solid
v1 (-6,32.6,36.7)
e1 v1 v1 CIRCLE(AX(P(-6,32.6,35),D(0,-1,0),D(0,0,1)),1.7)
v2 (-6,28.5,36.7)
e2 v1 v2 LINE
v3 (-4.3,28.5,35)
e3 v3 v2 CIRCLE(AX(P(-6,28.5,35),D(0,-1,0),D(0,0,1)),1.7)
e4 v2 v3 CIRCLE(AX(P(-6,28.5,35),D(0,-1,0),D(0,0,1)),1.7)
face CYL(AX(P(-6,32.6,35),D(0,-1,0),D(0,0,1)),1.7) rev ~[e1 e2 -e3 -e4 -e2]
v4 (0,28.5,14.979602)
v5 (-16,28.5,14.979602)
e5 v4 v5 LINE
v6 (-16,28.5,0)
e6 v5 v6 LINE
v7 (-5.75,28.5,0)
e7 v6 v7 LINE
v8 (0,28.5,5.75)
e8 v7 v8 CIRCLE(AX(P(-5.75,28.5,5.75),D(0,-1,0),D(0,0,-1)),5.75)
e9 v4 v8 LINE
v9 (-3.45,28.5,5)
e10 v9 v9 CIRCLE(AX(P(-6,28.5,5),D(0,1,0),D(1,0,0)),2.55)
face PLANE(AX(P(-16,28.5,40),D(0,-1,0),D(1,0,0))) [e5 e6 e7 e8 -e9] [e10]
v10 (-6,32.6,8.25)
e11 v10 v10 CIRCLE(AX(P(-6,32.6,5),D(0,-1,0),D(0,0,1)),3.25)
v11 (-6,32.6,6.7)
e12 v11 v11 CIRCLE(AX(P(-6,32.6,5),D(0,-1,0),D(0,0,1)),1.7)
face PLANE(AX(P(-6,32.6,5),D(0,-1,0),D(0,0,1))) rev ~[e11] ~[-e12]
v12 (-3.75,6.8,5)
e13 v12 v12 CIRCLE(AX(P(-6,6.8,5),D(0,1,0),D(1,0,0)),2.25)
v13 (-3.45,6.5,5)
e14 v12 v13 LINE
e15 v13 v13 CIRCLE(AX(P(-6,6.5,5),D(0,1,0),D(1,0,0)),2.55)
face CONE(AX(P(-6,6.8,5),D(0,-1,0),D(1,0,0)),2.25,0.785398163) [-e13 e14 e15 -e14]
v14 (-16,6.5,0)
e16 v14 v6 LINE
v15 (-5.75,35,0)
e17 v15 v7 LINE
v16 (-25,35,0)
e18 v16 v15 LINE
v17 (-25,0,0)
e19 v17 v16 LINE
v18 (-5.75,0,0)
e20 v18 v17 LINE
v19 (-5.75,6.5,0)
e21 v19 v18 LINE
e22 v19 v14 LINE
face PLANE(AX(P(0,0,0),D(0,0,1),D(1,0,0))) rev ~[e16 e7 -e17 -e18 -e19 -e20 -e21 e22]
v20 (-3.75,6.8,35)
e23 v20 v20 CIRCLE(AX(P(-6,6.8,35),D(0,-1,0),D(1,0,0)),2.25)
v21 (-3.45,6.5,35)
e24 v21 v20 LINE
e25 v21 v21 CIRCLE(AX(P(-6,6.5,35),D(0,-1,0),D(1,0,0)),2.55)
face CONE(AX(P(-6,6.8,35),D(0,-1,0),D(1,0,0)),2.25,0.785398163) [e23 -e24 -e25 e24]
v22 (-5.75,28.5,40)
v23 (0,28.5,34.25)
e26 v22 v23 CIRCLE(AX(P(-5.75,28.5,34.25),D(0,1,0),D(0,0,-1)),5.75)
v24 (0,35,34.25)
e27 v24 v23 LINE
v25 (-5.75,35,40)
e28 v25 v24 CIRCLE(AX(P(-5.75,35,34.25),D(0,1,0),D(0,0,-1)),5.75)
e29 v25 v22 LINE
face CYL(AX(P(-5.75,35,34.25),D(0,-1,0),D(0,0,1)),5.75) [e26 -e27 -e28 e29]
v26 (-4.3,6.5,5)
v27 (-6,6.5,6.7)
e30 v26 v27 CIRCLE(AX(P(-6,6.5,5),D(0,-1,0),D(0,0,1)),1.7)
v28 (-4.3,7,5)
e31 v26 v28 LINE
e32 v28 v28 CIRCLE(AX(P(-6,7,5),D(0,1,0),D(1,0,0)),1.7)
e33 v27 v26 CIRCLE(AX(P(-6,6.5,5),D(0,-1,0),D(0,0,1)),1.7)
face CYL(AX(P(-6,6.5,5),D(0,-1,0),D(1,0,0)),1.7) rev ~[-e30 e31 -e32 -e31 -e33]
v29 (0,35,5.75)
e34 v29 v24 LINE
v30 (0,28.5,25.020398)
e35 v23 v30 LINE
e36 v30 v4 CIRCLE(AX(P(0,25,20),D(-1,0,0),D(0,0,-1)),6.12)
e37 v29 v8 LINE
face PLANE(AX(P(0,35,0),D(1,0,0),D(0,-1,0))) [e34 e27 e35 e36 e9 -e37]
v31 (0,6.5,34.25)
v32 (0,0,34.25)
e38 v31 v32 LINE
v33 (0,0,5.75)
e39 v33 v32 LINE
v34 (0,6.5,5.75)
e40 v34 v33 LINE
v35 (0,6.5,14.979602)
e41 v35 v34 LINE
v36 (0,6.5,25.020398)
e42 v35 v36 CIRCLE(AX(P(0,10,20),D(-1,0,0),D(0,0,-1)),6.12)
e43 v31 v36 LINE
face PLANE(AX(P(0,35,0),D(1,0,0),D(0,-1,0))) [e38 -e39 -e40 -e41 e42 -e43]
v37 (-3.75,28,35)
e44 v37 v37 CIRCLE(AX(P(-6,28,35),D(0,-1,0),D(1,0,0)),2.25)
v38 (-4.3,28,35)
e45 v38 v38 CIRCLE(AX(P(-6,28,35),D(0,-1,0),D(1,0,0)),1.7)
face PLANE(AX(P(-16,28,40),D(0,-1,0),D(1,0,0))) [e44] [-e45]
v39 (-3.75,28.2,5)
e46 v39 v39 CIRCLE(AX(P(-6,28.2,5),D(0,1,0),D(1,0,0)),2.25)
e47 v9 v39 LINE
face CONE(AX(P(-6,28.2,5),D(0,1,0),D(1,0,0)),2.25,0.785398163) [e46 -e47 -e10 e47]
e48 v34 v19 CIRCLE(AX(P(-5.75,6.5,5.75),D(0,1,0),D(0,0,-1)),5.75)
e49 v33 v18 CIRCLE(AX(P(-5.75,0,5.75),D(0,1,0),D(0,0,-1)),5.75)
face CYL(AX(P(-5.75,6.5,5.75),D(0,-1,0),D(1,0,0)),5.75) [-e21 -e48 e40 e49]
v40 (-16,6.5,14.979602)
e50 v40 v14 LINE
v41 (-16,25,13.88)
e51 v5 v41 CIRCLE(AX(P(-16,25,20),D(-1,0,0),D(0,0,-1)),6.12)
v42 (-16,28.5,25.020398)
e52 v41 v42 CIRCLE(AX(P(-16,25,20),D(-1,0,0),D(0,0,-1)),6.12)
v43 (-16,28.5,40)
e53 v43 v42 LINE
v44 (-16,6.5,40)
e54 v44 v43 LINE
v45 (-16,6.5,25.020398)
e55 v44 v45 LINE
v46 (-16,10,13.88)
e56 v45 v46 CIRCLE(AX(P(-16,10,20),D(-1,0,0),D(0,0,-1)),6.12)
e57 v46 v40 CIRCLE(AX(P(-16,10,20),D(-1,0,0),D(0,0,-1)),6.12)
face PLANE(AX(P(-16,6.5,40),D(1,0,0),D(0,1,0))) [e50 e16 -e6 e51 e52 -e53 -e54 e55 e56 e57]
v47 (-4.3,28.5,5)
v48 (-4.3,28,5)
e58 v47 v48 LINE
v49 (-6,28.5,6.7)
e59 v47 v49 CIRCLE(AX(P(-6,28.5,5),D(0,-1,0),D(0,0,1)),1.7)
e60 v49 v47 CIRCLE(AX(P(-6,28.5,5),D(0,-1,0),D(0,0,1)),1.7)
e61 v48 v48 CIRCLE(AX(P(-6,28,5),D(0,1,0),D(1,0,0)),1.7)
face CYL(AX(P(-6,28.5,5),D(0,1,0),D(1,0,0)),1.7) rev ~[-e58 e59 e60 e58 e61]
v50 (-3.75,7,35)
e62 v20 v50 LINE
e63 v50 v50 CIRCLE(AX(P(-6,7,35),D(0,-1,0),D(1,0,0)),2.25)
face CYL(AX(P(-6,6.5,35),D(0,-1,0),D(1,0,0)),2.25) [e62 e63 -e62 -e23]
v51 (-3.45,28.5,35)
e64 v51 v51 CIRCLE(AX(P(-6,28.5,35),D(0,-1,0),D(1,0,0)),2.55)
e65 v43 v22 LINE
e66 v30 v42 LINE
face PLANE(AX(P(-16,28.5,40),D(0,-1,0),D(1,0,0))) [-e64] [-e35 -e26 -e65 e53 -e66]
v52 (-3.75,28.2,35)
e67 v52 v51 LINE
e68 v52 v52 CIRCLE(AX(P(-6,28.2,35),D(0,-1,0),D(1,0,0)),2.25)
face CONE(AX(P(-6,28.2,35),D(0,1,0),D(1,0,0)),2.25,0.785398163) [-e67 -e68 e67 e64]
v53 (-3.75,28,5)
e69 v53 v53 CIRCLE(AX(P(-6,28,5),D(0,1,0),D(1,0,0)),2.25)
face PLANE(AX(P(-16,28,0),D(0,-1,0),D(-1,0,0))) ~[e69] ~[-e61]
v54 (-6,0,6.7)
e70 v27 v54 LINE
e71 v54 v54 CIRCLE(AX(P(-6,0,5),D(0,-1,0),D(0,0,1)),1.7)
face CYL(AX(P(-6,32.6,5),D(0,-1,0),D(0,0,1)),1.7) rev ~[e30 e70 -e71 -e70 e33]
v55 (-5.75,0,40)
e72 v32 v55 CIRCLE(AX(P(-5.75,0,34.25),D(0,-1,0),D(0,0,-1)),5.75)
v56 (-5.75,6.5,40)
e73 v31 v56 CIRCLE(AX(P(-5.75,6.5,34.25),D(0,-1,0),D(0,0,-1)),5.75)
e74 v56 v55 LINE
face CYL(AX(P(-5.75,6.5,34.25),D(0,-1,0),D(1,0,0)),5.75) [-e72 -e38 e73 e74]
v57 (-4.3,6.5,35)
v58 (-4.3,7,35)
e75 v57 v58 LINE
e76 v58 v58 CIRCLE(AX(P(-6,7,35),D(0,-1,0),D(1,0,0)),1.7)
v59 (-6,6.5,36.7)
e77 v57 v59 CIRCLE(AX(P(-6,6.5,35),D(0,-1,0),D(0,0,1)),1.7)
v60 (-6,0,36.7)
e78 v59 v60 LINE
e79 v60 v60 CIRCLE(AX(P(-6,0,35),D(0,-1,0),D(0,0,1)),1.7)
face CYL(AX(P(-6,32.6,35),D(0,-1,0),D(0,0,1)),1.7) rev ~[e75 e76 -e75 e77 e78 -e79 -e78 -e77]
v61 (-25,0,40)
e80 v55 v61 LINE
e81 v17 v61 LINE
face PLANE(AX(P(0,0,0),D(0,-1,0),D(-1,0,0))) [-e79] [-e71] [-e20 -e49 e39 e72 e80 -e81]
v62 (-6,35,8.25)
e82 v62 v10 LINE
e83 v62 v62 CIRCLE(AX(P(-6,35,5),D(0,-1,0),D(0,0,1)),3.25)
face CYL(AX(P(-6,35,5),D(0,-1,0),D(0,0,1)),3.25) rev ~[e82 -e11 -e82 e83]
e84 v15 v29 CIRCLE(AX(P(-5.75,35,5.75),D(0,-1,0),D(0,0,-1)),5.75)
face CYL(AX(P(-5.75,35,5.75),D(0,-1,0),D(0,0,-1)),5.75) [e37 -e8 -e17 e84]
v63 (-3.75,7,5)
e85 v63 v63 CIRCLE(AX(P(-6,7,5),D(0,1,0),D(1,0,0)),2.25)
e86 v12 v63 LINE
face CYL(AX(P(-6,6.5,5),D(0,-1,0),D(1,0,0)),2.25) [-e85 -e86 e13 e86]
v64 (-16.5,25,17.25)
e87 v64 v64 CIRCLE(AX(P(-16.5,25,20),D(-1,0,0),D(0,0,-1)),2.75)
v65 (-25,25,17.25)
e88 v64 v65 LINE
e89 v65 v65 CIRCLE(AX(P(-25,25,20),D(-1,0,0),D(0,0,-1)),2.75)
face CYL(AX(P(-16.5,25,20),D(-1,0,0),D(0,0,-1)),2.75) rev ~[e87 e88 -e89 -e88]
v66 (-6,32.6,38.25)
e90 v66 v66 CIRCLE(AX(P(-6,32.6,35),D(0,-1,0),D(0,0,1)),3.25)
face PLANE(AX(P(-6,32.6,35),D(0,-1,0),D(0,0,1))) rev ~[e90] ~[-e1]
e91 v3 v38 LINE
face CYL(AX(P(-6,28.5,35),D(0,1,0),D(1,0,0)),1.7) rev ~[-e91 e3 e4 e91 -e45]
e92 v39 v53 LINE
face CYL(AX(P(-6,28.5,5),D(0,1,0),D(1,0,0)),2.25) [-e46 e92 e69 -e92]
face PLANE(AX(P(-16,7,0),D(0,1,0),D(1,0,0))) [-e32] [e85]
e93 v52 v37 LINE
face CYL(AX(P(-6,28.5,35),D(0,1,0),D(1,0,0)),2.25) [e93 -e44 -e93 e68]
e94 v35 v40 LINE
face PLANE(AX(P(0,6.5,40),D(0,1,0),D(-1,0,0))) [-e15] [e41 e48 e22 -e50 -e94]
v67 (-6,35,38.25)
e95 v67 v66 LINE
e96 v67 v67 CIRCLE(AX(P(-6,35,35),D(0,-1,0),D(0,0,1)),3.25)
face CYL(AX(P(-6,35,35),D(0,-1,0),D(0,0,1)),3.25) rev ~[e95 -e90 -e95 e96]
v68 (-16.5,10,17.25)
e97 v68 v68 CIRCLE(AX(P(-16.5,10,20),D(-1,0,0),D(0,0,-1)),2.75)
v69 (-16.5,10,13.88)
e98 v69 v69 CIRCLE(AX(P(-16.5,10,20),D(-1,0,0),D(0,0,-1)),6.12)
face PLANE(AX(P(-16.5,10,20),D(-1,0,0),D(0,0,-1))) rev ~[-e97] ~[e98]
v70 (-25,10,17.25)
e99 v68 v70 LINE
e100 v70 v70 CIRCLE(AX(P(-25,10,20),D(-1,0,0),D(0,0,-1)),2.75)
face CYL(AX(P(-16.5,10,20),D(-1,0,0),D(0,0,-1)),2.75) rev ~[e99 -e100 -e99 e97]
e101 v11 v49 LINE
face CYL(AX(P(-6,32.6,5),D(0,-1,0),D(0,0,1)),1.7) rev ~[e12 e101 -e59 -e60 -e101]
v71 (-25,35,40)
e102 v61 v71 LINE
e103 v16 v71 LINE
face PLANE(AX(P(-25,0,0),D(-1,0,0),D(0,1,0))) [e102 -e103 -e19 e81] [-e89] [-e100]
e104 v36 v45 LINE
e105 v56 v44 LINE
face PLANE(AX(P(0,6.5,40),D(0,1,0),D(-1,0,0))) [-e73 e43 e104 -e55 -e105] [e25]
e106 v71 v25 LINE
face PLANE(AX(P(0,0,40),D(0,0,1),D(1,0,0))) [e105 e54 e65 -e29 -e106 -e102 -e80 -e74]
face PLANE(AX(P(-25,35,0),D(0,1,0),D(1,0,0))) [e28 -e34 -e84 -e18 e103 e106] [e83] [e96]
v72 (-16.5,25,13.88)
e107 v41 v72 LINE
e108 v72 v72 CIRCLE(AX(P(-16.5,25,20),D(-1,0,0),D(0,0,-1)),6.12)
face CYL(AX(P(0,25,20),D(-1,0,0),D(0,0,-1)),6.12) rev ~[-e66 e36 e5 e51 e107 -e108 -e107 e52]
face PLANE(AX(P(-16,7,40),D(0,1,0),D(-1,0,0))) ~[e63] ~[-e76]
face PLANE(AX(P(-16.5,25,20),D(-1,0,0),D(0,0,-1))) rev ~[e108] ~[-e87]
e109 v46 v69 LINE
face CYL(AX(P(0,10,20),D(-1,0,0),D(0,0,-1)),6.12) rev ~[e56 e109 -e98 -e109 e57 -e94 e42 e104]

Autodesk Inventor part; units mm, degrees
ref_plane "YZ Plane" through (0, 0, 0) normal (1, 0, 0) x (0, 1, 0)
ref_plane "XZ Plane" through (0, 0, 0) normal (0, 1, 0) x (-1, 0, 0)
ref_plane "XY Plane" through (0, 0, 0) normal (0, 0, 1) x (1, 0, 0)
sketch "Skizze1" plane through (0, 0, 0) normal (0, 0, 1) x (1, 0, 0)
  line L0 (0, 0) -> (-25, 0)
  line L1 (-25, 0) -> (-25, 35)
  line L2 (-25, 35) -> (0, 35)
  line L3 (0, 35) -> (0, 0)
  dimension "d0" = 25
  dimension "d1" = 35
extrude "Extrusion1" add sketch "Skizze1" along normal blind 40
sketch "Skizze2" plane through (0, 0, 40) normal (0, 0, 1) x (1, 0, 0)
  line L0 (0, 6.5) -> (-16, 6.5)
  line L1 (-16, 6.5) -> (-16, 28.5)
  line L2 (-16, 28.5) -> (0, 28.5)
  line L3 (0, 28.5) -> (0, 6.5)
  line L4 (-25, 0) -> (0, 0) projected
  line L5 (0, 35) -> (-25, 35) projected
  line L6 (0, 0) -> (0, 35) projected
  dimension "d4" = 22
  dimension "d5" = 35
  dimension "d6" = 6.5
  dimension "d7" = 16
extrude "Extrusion2" cut sketch "Skizze2" against normal blind 40
sketch "Skizze3" plane through (0, 0, 40) normal (1, 0, 0) x (0, 0, -1)
  line L0 (0, 6.5) -> (0, 28.5) projected
  line L1 (40, 28.5) -> (40, 6.5) projected
  line L2 (40, 6.5) -> (0, 6.5) projected
  line L3 (40, 35) -> (0, 35) projected
  line L4 (40, 0) -> (0, 0) projected
  point P0 (20, 10)
  point P1 (20, 25)
  dimension "d10" = 15
  dimension "d11" = 20
  dimension "d12" = 40
  dimension "d15" = 35
  dimension "d16" = 10
hole "Bohrung1" at (0, 10, 20) at (0, 25, 20) direction (-1, 0, 0) diameter 5.5 end through all counterbore diameter 12.24 counterbore depth 16.5 clearance for "Sechskantbolzen" size "M5" standard "ANSI Metrisches M Profil"
sketch "Skizze4" plane through (-25, 35, 0) normal (0, 1, 0) x (1, 0, 0)
  line L0 (9, -40) -> (9, 0) projected
  line L1 (9, -40) -> (9, 0) projected
  line L2 (9, -13.88) -> (9, -26.12) projected
  line L3 (25, -40) -> (0, -40) projected
  line L4 (0, 0) -> (25, 0) projected
  point P0 (9, -14.9796)
  point P1 (9, -25.0204)
  point P2 (19, -5)
  point P3 (19, -35)
  dimension "d24" = 5
  dimension "d25" = 5
  dimension "d26" = 10
hole "Bohrung2" at (-6, 35, 5) at (-6, 35, 35) direction (0, -1, 0) diameter 3.4 end through all counterbore diameter 6.5 counterbore depth 2.4 clearance for "Zylinderschraube mit Schlitz DIN 84" size "M3" standard "DIN"
sketch "Skizze5" plane through (-16, 28.5, 40) normal (0, -1, 0) x (1, 0, 0)
  circle A0 centre (10, -5) radius 2.25
  circle A1 centre (10, -5) radius 1.7 projected
  point P0 (16, -40)
  dimension "d34" = 4.5
extrude "Extrusion3" add sketch "Skizze5" along normal blind 0.5
chamfer "Fase1" distance 0.3 angle 45 1 edges at (-8.25, 28.5, 35)
ref_plane "Arbeitsebene1" through (-25, 17.5, 0) normal (0, -1, 0) x (1, 0, 0)
ref_plane "Arbeitsebene2" through (0, 0, 20) normal (0, 0, 1) x (1, 0, 0)
mirror "Spiegeln1" about plane through (0, 0, 20) normal (0, 0, 1) of "Extrusion3", "Fase1"
mirror "Spiegeln2" about plane through (-25, 17.5, 0) normal (0, -1, 0) of "Extrusion3"
chamfer "Fase2" distance 0.3 angle 45 1 edges at (-8.25, 6.5, 35)
mirror "Spiegeln3" about plane through (0, 0, 20) normal (0, 0, 1) of "Extrusion3", "Spiegeln2", "Fase2"
fillet "Rundung1" radius 5.75 4 edges at (0, 3.25, 0) (0, 3.25, 40) (0, 31.75, 40) (0, 31.75, 0)
equation "\"d6\" = -0.5 * d4 + 0.5 * d5"
equation "\"d11\" = 0.5 * d12"
equation "\"d16\" = -0.5 * d10 + 0.5 * d15"
properties part number "belt_tensioner"
